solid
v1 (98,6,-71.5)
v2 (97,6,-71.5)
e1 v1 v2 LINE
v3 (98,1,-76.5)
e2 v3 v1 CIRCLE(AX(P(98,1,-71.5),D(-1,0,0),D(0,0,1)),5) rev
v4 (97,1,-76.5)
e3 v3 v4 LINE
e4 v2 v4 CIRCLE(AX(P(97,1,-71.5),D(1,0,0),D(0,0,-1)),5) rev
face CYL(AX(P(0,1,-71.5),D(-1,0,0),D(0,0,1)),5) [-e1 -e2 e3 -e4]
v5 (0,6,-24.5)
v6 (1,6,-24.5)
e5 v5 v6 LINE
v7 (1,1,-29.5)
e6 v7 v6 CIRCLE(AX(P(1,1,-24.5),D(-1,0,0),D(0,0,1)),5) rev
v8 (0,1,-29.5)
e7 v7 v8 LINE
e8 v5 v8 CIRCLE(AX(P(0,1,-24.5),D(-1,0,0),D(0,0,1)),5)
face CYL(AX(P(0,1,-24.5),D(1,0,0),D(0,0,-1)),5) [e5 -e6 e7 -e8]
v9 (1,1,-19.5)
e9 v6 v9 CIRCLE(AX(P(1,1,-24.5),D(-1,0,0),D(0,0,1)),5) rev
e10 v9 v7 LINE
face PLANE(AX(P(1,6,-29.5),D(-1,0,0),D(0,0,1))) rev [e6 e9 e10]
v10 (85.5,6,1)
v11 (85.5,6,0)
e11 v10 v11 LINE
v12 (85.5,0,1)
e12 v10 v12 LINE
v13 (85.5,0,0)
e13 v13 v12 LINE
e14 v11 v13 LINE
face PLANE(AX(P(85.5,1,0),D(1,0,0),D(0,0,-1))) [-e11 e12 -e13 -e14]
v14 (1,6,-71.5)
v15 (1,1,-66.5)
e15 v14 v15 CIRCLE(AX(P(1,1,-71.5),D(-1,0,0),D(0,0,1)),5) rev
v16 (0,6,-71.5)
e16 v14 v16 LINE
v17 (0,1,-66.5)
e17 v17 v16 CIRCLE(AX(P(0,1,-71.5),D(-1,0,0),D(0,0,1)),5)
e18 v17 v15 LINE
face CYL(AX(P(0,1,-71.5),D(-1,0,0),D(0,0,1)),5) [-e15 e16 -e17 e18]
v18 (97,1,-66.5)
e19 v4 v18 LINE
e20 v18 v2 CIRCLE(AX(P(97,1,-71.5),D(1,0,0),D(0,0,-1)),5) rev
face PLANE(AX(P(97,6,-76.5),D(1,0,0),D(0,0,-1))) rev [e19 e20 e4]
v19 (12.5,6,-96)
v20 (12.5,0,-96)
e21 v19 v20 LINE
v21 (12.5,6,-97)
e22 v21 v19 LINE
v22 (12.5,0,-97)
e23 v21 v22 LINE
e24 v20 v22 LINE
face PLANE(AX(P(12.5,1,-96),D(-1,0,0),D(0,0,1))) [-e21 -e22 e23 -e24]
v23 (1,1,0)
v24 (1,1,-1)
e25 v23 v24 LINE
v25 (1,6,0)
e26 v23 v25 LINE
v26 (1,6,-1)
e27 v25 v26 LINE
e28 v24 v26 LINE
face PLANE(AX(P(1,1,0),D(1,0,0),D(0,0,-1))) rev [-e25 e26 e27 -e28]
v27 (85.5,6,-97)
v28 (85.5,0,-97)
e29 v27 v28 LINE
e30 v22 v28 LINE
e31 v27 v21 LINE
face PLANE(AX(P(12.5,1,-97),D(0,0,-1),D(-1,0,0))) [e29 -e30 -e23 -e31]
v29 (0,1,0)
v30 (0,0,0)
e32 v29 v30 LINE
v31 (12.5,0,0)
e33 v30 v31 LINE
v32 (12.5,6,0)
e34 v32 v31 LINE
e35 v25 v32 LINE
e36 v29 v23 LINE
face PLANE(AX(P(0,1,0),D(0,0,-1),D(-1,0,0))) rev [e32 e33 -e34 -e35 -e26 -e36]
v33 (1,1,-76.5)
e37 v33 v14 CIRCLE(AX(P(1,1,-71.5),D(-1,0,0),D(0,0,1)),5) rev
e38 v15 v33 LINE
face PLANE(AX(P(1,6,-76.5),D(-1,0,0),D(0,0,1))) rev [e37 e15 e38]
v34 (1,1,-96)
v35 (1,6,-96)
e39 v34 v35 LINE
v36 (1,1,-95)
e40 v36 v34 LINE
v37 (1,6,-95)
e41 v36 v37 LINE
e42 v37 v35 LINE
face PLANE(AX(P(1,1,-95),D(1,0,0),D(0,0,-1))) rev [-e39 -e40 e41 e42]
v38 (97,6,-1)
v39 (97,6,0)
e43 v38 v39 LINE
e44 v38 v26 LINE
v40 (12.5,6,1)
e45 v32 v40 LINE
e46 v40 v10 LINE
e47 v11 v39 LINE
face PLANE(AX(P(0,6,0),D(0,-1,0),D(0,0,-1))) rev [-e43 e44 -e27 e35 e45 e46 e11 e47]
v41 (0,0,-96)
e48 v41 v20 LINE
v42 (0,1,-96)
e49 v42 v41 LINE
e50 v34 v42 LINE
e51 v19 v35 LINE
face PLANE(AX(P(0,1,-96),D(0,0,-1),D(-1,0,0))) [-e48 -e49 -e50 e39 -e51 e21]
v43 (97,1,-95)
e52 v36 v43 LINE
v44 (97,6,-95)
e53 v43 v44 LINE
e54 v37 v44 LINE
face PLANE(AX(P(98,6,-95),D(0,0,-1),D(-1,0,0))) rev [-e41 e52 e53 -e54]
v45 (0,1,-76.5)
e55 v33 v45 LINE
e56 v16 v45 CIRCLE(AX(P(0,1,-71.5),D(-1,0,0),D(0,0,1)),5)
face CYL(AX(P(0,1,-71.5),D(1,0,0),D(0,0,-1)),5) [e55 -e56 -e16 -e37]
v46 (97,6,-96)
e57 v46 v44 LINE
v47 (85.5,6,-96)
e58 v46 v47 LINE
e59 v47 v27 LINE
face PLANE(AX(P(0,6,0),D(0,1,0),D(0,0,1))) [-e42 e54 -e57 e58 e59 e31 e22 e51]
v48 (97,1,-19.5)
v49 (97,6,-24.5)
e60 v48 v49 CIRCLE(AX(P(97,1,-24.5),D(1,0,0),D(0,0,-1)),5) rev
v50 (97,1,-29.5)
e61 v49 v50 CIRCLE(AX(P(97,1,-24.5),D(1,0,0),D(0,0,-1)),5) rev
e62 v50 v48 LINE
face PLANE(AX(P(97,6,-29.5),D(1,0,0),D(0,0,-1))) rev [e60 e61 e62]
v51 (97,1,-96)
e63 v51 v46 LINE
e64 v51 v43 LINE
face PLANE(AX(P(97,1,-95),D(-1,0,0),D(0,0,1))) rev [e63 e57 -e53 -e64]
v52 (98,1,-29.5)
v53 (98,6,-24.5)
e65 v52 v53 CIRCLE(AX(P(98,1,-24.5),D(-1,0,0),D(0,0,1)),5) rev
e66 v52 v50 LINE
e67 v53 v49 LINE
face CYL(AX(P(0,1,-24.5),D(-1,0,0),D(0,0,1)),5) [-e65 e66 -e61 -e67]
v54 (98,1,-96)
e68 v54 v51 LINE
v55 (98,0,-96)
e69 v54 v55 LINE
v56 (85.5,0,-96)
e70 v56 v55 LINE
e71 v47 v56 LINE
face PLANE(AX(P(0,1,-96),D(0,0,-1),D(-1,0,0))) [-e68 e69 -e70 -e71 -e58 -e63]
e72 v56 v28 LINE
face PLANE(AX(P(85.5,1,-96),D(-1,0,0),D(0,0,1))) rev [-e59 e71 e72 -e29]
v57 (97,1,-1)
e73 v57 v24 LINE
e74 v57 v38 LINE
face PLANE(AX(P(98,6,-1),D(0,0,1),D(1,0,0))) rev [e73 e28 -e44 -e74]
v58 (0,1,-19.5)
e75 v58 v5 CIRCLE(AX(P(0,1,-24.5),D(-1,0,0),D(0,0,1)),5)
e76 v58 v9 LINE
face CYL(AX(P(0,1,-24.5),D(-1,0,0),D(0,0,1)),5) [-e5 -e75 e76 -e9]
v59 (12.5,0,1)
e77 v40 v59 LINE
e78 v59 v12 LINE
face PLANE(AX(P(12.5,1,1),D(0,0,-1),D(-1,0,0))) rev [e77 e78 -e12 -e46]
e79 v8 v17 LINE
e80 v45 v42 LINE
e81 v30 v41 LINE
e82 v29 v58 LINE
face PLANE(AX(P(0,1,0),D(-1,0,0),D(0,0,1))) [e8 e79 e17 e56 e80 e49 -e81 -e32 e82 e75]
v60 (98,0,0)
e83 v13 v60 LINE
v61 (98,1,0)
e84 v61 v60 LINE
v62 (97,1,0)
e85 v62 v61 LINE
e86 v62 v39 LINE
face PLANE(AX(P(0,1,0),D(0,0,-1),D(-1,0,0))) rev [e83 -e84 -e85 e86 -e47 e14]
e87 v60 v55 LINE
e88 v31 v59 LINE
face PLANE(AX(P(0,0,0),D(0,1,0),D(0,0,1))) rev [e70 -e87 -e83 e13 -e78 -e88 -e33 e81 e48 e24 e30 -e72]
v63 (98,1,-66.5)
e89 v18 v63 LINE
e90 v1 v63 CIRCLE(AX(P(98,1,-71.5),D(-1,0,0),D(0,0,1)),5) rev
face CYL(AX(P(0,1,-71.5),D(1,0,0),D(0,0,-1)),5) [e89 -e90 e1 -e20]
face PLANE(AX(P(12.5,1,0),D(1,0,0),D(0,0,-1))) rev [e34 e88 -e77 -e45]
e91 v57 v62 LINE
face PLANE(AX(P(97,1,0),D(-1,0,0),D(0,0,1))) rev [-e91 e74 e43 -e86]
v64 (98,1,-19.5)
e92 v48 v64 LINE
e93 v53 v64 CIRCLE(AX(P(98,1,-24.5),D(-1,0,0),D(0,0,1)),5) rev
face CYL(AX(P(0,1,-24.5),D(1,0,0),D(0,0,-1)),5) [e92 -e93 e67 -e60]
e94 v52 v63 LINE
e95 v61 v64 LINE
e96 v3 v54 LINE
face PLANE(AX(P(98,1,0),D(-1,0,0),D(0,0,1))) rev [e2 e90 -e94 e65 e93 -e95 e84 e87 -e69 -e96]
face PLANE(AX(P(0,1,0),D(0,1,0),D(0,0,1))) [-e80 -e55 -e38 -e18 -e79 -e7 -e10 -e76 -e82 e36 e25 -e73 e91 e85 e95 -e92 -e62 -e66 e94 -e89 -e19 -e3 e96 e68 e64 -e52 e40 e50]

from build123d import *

# Parameters (mm, degrees)
SKETCH1_W           = 98
SKETCH1_H           = 96
SKETCH1_W_2         = 73
SKETCH1_H_2         = 1
BOSS_EXTRUDE1_DEPTH = 1
SKETCH2_W           = 73
SKETCH2_H           = 1
BOSS_EXTRUDE2_DEPTH = 5
SKETCH3_W           = 98
SKETCH3_H           = 1
BOSS_EXTRUDE3_DEPTH = 5
SKETCH4_W           = 1
SKETCH4_H           = 10
BOSS_EXTRUDE4_DEPTH = 5
FILLET1_R           = 5
FILLET2_R           = 5
SKETCH5_W           = 1
SKETCH5_H           = 1
CUT_EXTRUDE1_DEPTH  = 5


with BuildPart() as part:
    # Sketch1 → Boss-Extrude1 (new body)
    with BuildSketch(Plane(origin=(0, 0, 0), x_dir=(1, 0, 0), z_dir=(0, 1, 0))):
        with Locations((49, 48)):
            Rectangle(SKETCH1_W, SKETCH1_H)
        with Locations((49, 96.5)):
            Rectangle(SKETCH1_W_2, SKETCH1_H_2)
        with Locations((49, -0.5)):
            Rectangle(SKETCH1_W_2, SKETCH1_H_2)
    extrude(amount=BOSS_EXTRUDE1_DEPTH)

    # Sketch2 → Boss-Extrude2 (add)
    with BuildSketch(Plane(origin=(0, 1, 0), x_dir=(1, 0, 0), z_dir=(0, 1, 0))):
        with Locations((49, -0.5)):
            Rectangle(SKETCH2_W, SKETCH2_H)
        with Locations((49, 96.5)):
            Rectangle(SKETCH2_W, SKETCH2_H)
    extrude(amount=BOSS_EXTRUDE2_DEPTH)

    # Sketch3 → Boss-Extrude3 (add)
    with BuildSketch(Plane(origin=(0, 1, 0), x_dir=(1, 0, 0), z_dir=(0, 1, 0))):
        with Locations((49, 95.5)):
            Rectangle(SKETCH3_W, SKETCH3_H)
        with Locations((49, 0.5)):
            Rectangle(SKETCH3_W, SKETCH3_H)
    extrude(amount=BOSS_EXTRUDE3_DEPTH)

    # Sketch4 → Boss-Extrude4 (add)
    with BuildSketch(Plane(origin=(0, 1, 0), x_dir=(1, 0, 0), z_dir=(0, 1, 0))):
        with Locations((0.5, 71.5)):
            Rectangle(SKETCH4_W, SKETCH4_H)
        with Locations((0.5, 24.5)):
            Rectangle(SKETCH4_W, SKETCH4_H)
        with Locations((97.5, 71.5)):
            Rectangle(SKETCH4_W, SKETCH4_H)
        with Locations((97.5, 24.5)):
            Rectangle(SKETCH4_W, SKETCH4_H)
    extrude(amount=BOSS_EXTRUDE4_DEPTH)

    # Fillet1
    fillet1_edges = [part.edges().sort_by_distance(p)[0] for p in [
        (97.5, 6, -19.5),
        (97.5, 6, -29.5),
    ]]
    fillet(fillet1_edges, radius=FILLET1_R - 0.0001)  # a hair under: the kernel refuses the full size

    # Fillet2
    fillet2_edges = [part.edges().sort_by_distance(p)[0] for p in [
        (0.5, 6, -29.5),
        (0.5, 6, -19.5),
        (0.5, 6, -66.5),
        (0.5, 6, -76.5),
        (97.5, 6, -66.5),
        (97.5, 6, -76.5),
    ]]
    fillet(fillet2_edges, radius=FILLET2_R - 0.0001)  # a hair under: the kernel refuses the full size

    # Sketch5 → Cut-Extrude1 (cut)
    with BuildSketch(Plane(origin=(0, 6, 0), x_dir=(1, 0, 0), z_dir=(0, 1, 0))):
        with Locations((0.5, 0.5)):
            Rectangle(SKETCH5_W, SKETCH5_H)
        with Locations((97.5, 0.5)):
            Rectangle(SKETCH5_W, SKETCH5_H)
        with Locations((97.5, 95.5)):
            Rectangle(SKETCH5_W, SKETCH5_H)
        with Locations((0.5, 95.5)):
            Rectangle(SKETCH5_W, SKETCH5_H)
    extrude(amount=-CUT_EXTRUDE1_DEPTH, mode=Mode.SUBTRACT)


solid = part.part
